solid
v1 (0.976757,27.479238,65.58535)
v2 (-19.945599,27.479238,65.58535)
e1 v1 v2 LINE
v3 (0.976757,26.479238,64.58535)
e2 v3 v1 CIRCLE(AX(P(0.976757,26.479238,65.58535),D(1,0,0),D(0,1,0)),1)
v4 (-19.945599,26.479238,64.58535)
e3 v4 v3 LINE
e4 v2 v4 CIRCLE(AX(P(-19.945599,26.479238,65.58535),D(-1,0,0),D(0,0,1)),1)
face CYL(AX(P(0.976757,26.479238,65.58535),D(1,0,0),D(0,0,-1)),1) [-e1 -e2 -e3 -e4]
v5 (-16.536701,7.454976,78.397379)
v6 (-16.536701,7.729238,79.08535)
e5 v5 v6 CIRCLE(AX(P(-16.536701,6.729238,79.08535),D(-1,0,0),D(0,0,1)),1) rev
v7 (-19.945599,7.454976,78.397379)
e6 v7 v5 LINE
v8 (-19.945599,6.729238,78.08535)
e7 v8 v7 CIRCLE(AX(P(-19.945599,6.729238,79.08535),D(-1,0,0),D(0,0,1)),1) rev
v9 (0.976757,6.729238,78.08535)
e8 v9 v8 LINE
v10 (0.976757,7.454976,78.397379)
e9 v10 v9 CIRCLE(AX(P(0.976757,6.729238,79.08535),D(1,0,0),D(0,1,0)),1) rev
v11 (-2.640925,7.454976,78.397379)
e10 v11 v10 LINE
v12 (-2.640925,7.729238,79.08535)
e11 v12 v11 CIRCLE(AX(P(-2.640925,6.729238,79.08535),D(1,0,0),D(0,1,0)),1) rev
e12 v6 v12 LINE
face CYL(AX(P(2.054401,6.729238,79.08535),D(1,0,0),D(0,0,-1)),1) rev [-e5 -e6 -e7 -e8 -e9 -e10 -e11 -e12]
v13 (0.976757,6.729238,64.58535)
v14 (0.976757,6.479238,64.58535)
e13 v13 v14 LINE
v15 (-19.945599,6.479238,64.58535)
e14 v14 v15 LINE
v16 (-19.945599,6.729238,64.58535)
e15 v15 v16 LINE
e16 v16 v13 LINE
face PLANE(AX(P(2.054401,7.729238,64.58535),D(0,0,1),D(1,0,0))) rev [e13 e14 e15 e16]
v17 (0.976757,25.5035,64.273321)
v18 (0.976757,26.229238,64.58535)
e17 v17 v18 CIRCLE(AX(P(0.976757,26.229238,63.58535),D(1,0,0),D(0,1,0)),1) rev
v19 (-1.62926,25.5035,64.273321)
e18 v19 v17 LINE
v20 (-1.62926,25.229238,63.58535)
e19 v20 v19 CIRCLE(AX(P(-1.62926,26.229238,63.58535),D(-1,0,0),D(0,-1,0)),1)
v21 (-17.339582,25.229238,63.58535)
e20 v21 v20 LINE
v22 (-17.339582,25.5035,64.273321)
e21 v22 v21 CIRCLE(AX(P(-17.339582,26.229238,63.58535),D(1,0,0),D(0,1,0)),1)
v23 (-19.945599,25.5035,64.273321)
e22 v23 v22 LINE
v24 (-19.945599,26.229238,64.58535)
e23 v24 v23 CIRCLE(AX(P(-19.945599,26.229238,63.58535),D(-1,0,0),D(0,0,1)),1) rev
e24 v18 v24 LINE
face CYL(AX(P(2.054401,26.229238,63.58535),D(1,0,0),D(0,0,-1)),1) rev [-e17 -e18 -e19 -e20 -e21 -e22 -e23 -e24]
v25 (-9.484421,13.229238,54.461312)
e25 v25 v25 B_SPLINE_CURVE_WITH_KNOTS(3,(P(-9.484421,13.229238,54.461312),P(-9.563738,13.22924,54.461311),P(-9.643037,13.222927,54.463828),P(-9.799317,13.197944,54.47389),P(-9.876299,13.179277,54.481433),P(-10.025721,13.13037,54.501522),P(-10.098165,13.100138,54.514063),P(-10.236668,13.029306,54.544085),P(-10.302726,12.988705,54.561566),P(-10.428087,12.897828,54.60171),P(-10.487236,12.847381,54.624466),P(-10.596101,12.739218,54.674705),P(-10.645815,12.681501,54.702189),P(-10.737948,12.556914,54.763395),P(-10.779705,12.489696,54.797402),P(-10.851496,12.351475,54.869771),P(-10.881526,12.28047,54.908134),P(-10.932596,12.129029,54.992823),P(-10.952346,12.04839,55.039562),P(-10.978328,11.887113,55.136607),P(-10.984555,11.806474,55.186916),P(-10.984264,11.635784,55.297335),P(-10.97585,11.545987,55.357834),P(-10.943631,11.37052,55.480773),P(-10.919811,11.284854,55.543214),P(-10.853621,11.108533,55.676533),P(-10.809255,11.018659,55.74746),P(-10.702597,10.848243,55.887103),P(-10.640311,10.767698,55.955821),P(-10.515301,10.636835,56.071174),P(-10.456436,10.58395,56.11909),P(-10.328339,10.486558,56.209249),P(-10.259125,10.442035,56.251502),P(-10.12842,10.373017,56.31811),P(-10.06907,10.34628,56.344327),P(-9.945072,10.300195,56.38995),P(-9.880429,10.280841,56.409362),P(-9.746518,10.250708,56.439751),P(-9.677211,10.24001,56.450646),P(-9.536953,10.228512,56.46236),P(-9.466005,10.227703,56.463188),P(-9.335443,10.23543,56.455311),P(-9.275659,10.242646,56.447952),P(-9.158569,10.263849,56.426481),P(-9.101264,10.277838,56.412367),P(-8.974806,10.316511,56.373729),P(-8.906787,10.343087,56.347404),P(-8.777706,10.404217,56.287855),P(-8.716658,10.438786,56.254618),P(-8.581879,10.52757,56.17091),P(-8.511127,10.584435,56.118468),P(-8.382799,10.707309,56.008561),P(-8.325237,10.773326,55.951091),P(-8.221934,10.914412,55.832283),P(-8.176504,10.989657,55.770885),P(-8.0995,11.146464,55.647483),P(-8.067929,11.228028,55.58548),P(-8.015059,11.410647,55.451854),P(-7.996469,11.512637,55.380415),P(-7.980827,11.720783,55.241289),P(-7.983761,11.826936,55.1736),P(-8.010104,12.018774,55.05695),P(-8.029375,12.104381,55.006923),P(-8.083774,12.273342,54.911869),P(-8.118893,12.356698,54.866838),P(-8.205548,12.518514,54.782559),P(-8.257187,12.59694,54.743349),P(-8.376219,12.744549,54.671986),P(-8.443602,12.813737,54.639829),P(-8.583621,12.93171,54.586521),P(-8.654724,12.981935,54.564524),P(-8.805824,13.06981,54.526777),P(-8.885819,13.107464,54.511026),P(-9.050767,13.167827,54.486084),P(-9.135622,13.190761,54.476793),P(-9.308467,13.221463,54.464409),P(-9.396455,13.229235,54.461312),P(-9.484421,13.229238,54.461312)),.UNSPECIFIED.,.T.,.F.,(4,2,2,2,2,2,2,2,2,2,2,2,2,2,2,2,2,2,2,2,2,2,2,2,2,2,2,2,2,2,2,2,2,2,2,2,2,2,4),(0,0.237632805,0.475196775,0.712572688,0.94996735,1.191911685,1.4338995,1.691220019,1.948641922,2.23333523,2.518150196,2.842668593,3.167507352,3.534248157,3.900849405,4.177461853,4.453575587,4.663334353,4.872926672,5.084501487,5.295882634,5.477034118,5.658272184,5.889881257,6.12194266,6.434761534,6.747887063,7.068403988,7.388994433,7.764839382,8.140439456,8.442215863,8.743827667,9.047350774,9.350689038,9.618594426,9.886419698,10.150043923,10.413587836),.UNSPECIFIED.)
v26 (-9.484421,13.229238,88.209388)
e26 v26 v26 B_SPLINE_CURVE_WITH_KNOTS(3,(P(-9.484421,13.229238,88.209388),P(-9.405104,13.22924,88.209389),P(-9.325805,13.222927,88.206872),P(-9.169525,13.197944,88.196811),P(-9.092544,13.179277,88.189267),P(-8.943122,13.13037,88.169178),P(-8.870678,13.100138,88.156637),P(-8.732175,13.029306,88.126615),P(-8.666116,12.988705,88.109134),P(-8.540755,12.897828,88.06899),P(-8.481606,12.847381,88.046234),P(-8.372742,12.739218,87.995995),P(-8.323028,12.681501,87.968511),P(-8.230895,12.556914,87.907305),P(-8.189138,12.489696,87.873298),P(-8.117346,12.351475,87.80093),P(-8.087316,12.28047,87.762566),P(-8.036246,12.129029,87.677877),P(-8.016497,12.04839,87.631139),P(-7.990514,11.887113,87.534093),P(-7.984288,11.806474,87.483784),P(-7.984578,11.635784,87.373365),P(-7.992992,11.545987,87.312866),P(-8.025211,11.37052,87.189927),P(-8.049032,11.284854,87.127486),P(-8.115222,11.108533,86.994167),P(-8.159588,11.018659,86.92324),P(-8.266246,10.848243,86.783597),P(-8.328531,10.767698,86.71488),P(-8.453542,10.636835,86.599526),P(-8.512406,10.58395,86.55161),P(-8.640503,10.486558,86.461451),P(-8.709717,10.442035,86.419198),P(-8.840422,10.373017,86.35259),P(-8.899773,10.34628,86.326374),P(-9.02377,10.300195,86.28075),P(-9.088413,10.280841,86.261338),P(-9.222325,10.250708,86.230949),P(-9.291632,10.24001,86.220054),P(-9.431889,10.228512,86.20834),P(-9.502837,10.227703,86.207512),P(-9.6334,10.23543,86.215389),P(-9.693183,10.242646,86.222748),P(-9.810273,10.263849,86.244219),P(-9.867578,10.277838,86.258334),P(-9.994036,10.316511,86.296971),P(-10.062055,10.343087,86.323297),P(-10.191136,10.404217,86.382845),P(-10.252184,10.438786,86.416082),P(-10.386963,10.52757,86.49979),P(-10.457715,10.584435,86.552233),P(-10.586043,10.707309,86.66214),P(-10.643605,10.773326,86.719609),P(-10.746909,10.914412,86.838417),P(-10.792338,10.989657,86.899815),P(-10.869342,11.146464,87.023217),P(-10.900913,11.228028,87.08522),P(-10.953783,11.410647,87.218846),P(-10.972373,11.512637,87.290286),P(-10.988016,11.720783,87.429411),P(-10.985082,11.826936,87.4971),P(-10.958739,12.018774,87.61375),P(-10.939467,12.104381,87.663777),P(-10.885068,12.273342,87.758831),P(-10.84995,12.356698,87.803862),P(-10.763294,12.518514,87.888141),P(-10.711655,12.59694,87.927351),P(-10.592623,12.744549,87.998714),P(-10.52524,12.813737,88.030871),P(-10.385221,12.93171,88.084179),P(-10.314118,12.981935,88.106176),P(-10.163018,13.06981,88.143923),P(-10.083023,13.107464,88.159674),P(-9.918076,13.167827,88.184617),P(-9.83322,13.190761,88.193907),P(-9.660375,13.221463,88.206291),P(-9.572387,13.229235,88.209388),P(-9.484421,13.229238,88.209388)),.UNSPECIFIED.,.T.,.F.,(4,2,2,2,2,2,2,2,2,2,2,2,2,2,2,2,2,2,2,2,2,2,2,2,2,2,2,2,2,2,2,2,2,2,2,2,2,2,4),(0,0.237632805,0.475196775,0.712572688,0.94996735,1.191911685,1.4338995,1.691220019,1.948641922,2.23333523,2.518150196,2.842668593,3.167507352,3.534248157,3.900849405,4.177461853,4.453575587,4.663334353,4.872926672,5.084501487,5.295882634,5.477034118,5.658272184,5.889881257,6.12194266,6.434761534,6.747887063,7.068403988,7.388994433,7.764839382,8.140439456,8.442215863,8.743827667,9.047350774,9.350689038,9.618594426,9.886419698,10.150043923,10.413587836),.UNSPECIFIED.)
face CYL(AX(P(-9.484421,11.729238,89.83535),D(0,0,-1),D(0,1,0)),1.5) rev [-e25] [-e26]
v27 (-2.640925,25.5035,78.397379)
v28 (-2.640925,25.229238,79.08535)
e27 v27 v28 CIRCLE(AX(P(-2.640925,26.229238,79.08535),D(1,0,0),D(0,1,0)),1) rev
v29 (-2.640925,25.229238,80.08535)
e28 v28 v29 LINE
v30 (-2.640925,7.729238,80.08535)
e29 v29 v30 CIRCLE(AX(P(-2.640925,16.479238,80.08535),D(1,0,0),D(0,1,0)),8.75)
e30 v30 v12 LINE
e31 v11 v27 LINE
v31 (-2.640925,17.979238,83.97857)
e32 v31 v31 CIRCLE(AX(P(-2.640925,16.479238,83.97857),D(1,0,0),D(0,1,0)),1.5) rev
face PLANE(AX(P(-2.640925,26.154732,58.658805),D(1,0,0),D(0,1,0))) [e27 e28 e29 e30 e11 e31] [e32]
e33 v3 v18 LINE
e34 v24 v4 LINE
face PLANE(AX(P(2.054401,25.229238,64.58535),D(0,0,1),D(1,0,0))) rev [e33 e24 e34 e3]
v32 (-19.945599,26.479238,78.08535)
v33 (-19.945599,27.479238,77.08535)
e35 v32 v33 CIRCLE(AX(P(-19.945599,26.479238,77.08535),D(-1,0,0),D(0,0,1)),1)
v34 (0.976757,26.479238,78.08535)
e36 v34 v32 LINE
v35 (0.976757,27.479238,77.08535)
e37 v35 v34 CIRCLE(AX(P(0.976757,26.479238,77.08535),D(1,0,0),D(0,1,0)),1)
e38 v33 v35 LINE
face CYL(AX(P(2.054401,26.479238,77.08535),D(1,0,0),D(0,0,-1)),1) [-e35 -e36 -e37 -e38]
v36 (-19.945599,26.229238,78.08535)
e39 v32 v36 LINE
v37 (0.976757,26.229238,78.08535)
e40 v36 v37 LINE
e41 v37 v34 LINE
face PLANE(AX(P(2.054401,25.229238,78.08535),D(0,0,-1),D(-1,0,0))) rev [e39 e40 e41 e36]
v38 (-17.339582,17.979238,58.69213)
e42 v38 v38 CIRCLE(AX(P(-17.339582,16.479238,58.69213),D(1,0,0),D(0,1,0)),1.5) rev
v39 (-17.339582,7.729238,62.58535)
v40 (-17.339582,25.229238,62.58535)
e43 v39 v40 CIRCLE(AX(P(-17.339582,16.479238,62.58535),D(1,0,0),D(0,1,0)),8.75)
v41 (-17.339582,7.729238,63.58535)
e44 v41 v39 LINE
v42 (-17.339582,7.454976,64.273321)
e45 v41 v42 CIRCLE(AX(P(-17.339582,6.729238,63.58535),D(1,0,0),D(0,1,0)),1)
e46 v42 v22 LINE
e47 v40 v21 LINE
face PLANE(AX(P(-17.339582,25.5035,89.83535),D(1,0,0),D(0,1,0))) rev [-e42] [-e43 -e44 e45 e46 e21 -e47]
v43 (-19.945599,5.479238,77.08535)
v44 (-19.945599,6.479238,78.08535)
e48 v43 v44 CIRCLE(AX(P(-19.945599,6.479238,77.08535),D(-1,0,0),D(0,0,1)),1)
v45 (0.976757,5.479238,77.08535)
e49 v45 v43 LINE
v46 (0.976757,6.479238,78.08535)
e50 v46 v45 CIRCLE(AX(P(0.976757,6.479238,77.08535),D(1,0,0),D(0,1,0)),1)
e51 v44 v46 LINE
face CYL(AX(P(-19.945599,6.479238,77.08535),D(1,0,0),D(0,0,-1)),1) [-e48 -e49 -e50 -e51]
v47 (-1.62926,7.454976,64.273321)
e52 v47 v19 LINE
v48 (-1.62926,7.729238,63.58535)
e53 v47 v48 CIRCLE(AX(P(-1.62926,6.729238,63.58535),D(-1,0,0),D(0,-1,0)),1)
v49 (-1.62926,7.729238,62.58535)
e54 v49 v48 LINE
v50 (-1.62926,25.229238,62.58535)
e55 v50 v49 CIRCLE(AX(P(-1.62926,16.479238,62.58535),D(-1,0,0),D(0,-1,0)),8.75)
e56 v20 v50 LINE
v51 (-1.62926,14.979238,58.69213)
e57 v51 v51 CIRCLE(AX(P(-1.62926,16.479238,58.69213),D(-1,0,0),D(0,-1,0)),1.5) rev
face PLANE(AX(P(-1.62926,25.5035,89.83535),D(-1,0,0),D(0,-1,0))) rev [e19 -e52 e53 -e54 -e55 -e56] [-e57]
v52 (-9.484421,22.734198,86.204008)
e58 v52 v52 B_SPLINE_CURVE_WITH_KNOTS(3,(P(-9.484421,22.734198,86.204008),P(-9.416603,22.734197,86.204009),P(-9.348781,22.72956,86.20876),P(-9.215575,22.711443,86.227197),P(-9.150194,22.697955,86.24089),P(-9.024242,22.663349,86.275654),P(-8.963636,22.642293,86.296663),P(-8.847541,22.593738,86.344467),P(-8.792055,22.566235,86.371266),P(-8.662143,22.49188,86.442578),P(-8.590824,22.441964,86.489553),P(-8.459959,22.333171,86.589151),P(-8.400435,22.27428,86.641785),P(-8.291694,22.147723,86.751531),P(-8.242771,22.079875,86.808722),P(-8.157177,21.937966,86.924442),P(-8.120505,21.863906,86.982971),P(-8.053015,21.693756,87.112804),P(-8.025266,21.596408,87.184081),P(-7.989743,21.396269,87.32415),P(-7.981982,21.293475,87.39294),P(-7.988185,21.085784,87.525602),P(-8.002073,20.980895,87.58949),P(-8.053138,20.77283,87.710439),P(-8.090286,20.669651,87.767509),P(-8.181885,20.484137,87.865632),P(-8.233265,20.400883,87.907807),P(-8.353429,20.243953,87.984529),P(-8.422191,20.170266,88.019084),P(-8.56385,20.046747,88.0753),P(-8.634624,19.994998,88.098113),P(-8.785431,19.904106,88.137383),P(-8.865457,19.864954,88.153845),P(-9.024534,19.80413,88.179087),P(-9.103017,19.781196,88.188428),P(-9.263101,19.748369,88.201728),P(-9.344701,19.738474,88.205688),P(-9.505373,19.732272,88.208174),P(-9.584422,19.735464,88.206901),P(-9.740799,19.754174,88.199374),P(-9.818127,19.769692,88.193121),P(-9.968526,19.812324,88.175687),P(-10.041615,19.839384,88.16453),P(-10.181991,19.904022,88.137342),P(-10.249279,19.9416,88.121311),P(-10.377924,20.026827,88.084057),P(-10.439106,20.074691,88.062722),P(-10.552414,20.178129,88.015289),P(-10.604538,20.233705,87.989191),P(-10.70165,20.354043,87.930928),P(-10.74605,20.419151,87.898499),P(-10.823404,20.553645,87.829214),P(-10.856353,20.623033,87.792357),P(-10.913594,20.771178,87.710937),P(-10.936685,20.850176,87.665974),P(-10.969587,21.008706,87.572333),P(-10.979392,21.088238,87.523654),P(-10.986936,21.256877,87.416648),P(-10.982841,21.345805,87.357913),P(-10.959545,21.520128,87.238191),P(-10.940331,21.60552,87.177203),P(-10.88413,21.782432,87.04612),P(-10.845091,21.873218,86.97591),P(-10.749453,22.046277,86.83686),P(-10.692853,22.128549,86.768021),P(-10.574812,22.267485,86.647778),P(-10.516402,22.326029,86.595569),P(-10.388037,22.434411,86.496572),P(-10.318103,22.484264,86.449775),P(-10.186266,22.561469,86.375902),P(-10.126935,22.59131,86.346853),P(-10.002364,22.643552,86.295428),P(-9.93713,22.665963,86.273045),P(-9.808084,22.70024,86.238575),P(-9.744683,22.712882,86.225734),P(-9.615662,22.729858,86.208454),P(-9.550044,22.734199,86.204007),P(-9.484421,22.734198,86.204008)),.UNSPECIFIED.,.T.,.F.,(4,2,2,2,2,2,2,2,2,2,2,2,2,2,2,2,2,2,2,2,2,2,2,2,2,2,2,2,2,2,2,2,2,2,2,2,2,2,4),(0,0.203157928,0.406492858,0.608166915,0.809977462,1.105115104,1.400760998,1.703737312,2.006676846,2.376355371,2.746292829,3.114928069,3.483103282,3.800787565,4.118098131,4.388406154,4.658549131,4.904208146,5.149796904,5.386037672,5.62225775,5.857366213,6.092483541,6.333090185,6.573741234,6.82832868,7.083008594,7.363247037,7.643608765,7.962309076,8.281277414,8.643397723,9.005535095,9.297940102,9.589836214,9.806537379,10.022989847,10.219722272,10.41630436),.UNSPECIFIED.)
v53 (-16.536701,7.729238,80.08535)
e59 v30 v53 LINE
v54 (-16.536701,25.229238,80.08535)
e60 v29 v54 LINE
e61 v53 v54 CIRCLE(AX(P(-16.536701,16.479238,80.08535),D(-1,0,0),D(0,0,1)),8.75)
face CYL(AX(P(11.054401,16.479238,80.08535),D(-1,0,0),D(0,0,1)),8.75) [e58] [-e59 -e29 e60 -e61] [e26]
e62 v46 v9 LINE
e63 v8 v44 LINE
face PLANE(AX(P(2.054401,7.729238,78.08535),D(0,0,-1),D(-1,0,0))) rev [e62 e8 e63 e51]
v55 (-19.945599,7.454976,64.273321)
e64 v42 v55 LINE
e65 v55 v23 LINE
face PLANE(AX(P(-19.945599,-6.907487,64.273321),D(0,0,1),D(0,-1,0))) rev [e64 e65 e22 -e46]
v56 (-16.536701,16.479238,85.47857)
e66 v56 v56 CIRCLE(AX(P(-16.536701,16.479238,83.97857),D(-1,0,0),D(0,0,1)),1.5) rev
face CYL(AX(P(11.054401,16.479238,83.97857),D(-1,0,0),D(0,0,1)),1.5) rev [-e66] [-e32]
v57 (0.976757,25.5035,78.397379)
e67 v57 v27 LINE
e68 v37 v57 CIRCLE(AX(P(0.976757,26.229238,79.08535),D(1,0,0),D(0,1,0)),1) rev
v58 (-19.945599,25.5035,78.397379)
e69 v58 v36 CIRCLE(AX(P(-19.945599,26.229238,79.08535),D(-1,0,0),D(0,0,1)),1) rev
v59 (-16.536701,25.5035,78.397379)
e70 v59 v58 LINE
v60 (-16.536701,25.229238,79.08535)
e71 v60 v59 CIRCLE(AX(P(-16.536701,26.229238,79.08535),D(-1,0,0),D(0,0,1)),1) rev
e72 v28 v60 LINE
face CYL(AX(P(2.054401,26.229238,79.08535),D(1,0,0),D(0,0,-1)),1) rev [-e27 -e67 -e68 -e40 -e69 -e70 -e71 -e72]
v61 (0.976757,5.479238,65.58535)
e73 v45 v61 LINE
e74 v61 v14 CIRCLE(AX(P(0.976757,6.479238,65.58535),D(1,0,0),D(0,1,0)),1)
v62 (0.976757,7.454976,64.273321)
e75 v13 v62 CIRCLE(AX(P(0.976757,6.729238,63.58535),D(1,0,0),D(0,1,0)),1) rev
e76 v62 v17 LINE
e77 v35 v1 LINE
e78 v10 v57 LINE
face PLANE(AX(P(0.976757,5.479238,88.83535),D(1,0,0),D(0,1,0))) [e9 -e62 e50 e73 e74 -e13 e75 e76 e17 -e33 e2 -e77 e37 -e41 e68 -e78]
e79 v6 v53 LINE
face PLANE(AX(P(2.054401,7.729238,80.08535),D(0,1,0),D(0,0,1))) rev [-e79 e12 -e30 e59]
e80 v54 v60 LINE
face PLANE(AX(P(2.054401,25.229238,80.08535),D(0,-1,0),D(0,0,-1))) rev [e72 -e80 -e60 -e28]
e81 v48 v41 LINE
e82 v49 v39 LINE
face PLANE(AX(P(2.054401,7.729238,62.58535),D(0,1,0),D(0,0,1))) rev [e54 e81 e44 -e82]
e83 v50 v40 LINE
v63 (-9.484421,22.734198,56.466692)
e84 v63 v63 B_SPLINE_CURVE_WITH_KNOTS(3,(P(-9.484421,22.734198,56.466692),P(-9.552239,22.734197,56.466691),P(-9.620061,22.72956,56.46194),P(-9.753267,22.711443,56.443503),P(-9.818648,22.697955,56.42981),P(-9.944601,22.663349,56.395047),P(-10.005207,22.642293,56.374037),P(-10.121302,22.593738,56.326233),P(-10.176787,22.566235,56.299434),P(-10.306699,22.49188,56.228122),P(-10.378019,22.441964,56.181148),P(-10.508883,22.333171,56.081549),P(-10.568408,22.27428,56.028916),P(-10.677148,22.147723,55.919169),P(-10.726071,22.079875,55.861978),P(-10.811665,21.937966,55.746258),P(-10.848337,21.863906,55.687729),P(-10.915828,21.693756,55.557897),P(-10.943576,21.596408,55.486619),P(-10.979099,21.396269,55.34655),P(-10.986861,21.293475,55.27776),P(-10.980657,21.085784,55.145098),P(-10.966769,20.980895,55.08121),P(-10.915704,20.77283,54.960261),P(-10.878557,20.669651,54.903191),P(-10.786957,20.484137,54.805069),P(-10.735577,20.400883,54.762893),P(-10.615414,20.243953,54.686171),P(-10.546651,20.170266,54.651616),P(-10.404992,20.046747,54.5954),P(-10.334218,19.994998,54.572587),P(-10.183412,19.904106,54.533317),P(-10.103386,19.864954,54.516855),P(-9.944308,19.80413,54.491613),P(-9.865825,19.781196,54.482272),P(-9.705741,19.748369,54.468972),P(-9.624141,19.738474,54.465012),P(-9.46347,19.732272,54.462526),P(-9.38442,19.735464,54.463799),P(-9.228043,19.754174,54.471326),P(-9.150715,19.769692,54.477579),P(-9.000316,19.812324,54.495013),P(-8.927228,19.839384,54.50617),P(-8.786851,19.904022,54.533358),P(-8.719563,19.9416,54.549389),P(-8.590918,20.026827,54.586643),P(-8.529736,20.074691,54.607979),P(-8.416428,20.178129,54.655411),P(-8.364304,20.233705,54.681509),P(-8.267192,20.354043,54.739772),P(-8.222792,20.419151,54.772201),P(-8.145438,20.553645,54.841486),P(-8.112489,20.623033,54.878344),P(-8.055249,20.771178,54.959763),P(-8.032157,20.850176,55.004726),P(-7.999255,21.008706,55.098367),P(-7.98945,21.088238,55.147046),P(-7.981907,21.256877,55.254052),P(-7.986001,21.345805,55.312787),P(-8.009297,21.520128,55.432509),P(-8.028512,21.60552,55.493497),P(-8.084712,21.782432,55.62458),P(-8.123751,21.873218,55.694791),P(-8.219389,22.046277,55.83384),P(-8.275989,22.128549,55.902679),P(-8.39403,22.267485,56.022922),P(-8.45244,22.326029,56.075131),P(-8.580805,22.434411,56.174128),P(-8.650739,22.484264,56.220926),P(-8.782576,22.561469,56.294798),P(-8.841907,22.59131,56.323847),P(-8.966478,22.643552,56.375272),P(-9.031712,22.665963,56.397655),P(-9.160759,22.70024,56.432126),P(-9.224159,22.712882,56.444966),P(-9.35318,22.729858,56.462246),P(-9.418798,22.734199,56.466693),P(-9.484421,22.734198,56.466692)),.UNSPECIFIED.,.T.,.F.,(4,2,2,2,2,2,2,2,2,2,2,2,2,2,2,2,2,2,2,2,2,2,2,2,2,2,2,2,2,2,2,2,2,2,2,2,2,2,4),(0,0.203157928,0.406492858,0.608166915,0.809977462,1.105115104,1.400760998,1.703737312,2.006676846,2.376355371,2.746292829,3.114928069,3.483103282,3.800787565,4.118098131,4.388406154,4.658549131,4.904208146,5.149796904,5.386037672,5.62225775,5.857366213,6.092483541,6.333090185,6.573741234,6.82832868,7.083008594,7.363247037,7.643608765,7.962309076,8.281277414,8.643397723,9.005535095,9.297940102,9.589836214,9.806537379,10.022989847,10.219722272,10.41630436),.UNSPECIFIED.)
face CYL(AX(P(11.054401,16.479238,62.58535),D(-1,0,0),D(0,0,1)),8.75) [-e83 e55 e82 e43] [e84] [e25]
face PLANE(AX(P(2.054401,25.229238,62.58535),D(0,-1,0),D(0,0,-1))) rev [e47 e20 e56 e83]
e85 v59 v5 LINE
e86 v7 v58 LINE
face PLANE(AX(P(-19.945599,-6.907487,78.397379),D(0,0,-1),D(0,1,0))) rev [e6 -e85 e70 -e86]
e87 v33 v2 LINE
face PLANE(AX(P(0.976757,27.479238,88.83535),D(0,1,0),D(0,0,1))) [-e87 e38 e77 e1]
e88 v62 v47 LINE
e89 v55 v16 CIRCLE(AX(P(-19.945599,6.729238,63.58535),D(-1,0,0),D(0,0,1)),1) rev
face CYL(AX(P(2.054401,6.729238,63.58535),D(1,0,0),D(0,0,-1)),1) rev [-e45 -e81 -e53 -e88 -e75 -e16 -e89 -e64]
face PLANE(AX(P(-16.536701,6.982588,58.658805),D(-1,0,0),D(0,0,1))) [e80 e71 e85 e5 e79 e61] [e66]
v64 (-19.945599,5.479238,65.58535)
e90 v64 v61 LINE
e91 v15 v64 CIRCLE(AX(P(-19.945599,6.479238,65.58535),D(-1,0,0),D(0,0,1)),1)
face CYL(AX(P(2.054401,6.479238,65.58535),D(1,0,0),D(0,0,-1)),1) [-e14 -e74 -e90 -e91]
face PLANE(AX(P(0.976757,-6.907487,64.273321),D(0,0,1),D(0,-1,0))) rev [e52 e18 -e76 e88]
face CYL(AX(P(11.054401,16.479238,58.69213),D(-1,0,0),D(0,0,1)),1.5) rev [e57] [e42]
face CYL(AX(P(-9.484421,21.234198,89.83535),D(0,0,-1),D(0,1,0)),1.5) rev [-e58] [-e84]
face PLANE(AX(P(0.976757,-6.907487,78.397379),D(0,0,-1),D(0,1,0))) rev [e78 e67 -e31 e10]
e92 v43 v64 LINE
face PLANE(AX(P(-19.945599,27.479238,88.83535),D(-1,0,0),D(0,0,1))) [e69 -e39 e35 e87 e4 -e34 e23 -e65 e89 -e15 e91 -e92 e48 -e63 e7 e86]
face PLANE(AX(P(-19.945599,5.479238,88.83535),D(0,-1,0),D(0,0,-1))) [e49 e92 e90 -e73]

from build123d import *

# Parameters (mm, degrees)
SKETCH2_W           = 20.922356035
SKETCH2_H           = 22
BOSS_EXTRUDE1_DEPTH = 35
SKETCH3_R           = 1.5
CUT_EXTRUDE1_DEPTH  = 31
SKETCH7_W           = 2
SKETCH7_H           = 2.25
CUT_EXTRUDE3_DEPTH  = 22
SKETCH8_W           = 2
SKETCH8_H           = 2.25
CUT_EXTRUDE4_DEPTH  = 22
SKETCH11_R          = 1.5
SKETCH11_W          = 2.606017342
SKETCH11_H          = 18.048523845
SKETCH11_W_2        = 2.606017343
CUT_EXTRUDE5_DEPTH  = 36
FILLET2_R           = 1
BOSS_EXTRUDE2_REACH = 95.223
SKETCH12_W          = 2.606017343
SKETCH12_H          = 14.124057788
SKETCH12_W_2        = 2.606017342
CUT_EXTRUDE6_REACH  = 54.468
SKETCH13_W          = 3.309729442
SKETCH13_H          = 19.459110601
SKETCH13_W_2        = 3.249965826
SKETCH13_H_2        = 19.123541834


with BuildPart() as part:
    # Sketch2 → Boss-Extrude1 (new body)
    with BuildSketch(Plane(origin=(0, 0, 53.835350067), x_dir=(-1, 0, 0), z_dir=(0, 0, -1))):
        with Locations((9.484421134, 16.479237668)):
            Rectangle(SKETCH2_W, SKETCH2_H)
    extrude(amount=-BOSS_EXTRUDE1_DEPTH)

    # Sketch3 → Cut-Extrude1 (cut)
    with BuildSketch(Plane.ZY.offset(19.945599152)):
        with Locations((58.692130127, 16.479237668)):
            Circle(SKETCH3_R)
        with Locations((83.978570007, 16.479237668)):
            Circle(SKETCH3_R)
        with BuildLine():
            Line((62.585350067, 25.229237668), (62.585350067, 27.479237668))
            add(Edge.make_bspline(
                [(62.585350067, 5.479237668), (55.503237571, -7.59972181), (27.642884441, 16.75686213), (54.847177094, 35.965561503), (62.585350067, 27.479237668)],
                knots=[0, 0, 0, 0, 0.52323238, 1, 1, 1, 1], degree=3))
            Line((62.585350067, 5.479237668), (62.585350067, 7.729237668))
            ThreePointArc((62.585350067, 7.729237668), (56.398165732, 10.292053333), (53.835350067, 16.479237668))
            ThreePointArc((53.835350067, 16.479237668), (56.398165732, 22.666422004), (62.585350067, 25.229237668))
        make_face()
        with BuildLine():
            Line((80.085350067, 25.229237668), (80.085350067, 27.479237668))
            add(Edge.make_bspline(
                [(80.085350067, 5.479237668), (87.439945262, -7.310081119), (114.923859956, 16.481856124), (87.400752328, 40.475015582), (80.085350067, 27.479237668)],
                knots=[0, 0, 0, 0, 0.498892453, 1, 1, 1, 1], degree=3))
            Line((80.085350067, 5.479237668), (80.085350067, 7.729237668))
            ThreePointArc((80.085350067, 7.729237668), (86.272534402, 10.292053333), (88.835350067, 16.479237668))
            ThreePointArc((88.835350067, 16.479237668), (86.272534402, 22.666422004), (80.085350067, 25.229237668))
        make_face()
    extrude(amount=-CUT_EXTRUDE1_DEPTH, mode=Mode.SUBTRACT)

    # Sketch7 → Cut-Extrude3 (cut)
    with BuildSketch(Plane.ZY.offset(19.945599152)):
        with Locations((63.585350067, 26.354237668)):
            Rectangle(SKETCH7_W, SKETCH7_H)
        with Locations((79.085350067, 26.354237668)):
            Rectangle(SKETCH7_W, SKETCH7_H)
    extrude(amount=-CUT_EXTRUDE3_DEPTH, mode=Mode.SUBTRACT)

    # Sketch8 → Cut-Extrude4 (cut)
    with BuildSketch(Plane.ZY.offset(19.945599152)):
        with Locations((63.585350067, 6.604237668)):
            Rectangle(SKETCH8_W, SKETCH8_H)
        with Locations((79.085350067, 6.604237668)):
            Rectangle(SKETCH8_W, SKETCH8_H)
    extrude(amount=-CUT_EXTRUDE4_DEPTH, mode=Mode.SUBTRACT)

    # Sketch11 → Cut-Extrude5 (cut)
    with BuildSketch(Plane(origin=(0, 0, 53.835350067), x_dir=(-1, 0, 0), z_dir=(0, 0, -1))):
        with Locations(Location((9.484421134, 11.729237668, 0), (0, 0, 90))):
            Circle(SKETCH11_R)
        with Locations(Location((9.484421134, 21.23419775, 0), (0, 0, 90))):
            Circle(SKETCH11_R)
        with Locations((0.326251788, 16.479237669)):
            Rectangle(SKETCH11_W, SKETCH11_H)
        with Locations((18.642590481, 16.479237669)):
            Rectangle(SKETCH11_W_2, SKETCH11_H)
    extrude(amount=-CUT_EXTRUDE5_DEPTH, mode=Mode.SUBTRACT)

    # Fillet2
    fillet2_edges = [part.edges().sort_by_distance(p)[0] for p in [
        (-9.484421134, 27.479237668, 78.085350067),
    ]]
    fillet(fillet2_edges, radius=FILLET2_R)
    fillet2_2_edges = [part.edges().sort_by_distance(p)[0] for p in [
        (-9.484421134, 27.479237668, 64.585350067),
    ]]
    fillet(fillet2_2_edges, radius=FILLET2_R)
    fillet2_3_edges = [part.edges().sort_by_distance(p)[0] for p in [
        (-9.484421134, 7.729237668, 64.585350067),
    ]]
    fillet(fillet2_3_edges, radius=FILLET2_R)
    fillet2_4_edges = [part.edges().sort_by_distance(p)[0] for p in [
        (-9.484421134, 25.229237668, 64.585350067),
    ]]
    fillet(fillet2_4_edges, radius=FILLET2_R)
    fillet2_5_edges = [part.edges().sort_by_distance(p)[0] for p in [
        (-9.484421134, 25.229237668, 78.085350067),
    ]]
    fillet(fillet2_5_edges, radius=FILLET2_R)
    fillet2_6_edges = [part.edges().sort_by_distance(p)[0] for p in [
        (-9.484421134, 7.729237668, 78.085350067),
    ]]
    fillet(fillet2_6_edges, radius=FILLET2_R)
    fillet2_7_edges = [part.edges().sort_by_distance(p)[0] for p in [
        (-9.484421134, 5.479237668, 78.085350067),
    ]]
    fillet(fillet2_7_edges, radius=FILLET2_R)
    fillet2_8_edges = [part.edges().sort_by_distance(p)[0] for p in [
        (-9.484421134, 5.479237668, 64.585350067),
    ]]
    fillet(fillet2_8_edges, radius=FILLET2_R)

    # Boss-Extrude2: up to this face of the body (flat: up to its plane)
    boss_extrude2_end = Plane(part.part.faces().sort_by_distance((-18.642590481, 7.454975746, 71.335350067))[0])
    # Sketch12 → Boss-Extrude2 (add, up to the picked face)
    with BuildSketch(Plane.XZ.offset(-25.503499591), mode=Mode.PRIVATE) as boss_extrude2_sk1:
        with Locations((-18.642590481, 71.335350067)):
            Rectangle(SKETCH12_W, SKETCH12_H)
    boss_extrude2_tool1 = split(extrude(boss_extrude2_sk1.sketch, amount=BOSS_EXTRUDE2_REACH, mode=Mode.PRIVATE), bisect_by=boss_extrude2_end, keep=Keep.BOTH, mode=Mode.PRIVATE)
    # Sketch12 → Boss-Extrude2 (add, up to the picked face)
    with BuildSketch(Plane.XZ.offset(-25.503499591), mode=Mode.PRIVATE) as boss_extrude2_sk2:
        with Locations((-0.326251788, 71.335350067)):
            Rectangle(SKETCH12_W_2, SKETCH12_H)
    boss_extrude2_tool2 = split(extrude(boss_extrude2_sk2.sketch, amount=BOSS_EXTRUDE2_REACH, mode=Mode.PRIVATE), bisect_by=boss_extrude2_end, keep=Keep.BOTH, mode=Mode.PRIVATE)
    add(boss_extrude2_tool1.solids().sort_by(Axis((-18.64259, 25.5035, 71.33535), (0, -1, 0)))[0])
    add(boss_extrude2_tool2.solids().sort_by(Axis((-0.326252, 25.5035, 71.33535), (0, -1, 0)))[0])

    # Cut-Extrude6: up to this face of the body (flat: up to its plane)
    cut_extrude6_end = Plane(part.part.faces().sort_by_distance((-0.326251788, 16.479237668, 78.397378961))[0])
    # Sketch13 → Cut-Extrude6 (cut, up to the picked face)
    with BuildSketch(Plane(origin=(0, 0, 93.835350067), x_dir=(-1, 0, 0), z_dir=(0, 0, -1)), mode=Mode.PRIVATE) as cut_extrude6_sk1:
        with Locations((18.191565455, 16.712143076)):
            Rectangle(SKETCH13_W, SKETCH13_H)
    cut_extrude6_tool1 = split(extrude(cut_extrude6_sk1.sketch, amount=CUT_EXTRUDE6_REACH, mode=Mode.PRIVATE), bisect_by=cut_extrude6_end, keep=Keep.BOTH, mode=Mode.PRIVATE)
    # Sketch13 → Cut-Extrude6 (cut, up to the picked face)
    with BuildSketch(Plane(origin=(0, 0, 93.835350067), x_dir=(-1, 0, 0), z_dir=(0, 0, -1)), mode=Mode.PRIVATE) as cut_extrude6_sk2:
        with Locations((1.015942541, 16.59296095)):
            Rectangle(SKETCH13_W_2, SKETCH13_H_2)
    cut_extrude6_tool2 = split(extrude(cut_extrude6_sk2.sketch, amount=CUT_EXTRUDE6_REACH, mode=Mode.PRIVATE), bisect_by=cut_extrude6_end, keep=Keep.BOTH, mode=Mode.PRIVATE)
    add(cut_extrude6_tool1.solids().sort_by(Axis((-18.191565, 16.712143, 93.83535), (0, 0, -1)))[0], mode=Mode.SUBTRACT)
    add(cut_extrude6_tool2.solids().sort_by(Axis((-1.015943, 16.592961, 93.83535), (0, 0, -1)))[0], mode=Mode.SUBTRACT)


solid = part.part
